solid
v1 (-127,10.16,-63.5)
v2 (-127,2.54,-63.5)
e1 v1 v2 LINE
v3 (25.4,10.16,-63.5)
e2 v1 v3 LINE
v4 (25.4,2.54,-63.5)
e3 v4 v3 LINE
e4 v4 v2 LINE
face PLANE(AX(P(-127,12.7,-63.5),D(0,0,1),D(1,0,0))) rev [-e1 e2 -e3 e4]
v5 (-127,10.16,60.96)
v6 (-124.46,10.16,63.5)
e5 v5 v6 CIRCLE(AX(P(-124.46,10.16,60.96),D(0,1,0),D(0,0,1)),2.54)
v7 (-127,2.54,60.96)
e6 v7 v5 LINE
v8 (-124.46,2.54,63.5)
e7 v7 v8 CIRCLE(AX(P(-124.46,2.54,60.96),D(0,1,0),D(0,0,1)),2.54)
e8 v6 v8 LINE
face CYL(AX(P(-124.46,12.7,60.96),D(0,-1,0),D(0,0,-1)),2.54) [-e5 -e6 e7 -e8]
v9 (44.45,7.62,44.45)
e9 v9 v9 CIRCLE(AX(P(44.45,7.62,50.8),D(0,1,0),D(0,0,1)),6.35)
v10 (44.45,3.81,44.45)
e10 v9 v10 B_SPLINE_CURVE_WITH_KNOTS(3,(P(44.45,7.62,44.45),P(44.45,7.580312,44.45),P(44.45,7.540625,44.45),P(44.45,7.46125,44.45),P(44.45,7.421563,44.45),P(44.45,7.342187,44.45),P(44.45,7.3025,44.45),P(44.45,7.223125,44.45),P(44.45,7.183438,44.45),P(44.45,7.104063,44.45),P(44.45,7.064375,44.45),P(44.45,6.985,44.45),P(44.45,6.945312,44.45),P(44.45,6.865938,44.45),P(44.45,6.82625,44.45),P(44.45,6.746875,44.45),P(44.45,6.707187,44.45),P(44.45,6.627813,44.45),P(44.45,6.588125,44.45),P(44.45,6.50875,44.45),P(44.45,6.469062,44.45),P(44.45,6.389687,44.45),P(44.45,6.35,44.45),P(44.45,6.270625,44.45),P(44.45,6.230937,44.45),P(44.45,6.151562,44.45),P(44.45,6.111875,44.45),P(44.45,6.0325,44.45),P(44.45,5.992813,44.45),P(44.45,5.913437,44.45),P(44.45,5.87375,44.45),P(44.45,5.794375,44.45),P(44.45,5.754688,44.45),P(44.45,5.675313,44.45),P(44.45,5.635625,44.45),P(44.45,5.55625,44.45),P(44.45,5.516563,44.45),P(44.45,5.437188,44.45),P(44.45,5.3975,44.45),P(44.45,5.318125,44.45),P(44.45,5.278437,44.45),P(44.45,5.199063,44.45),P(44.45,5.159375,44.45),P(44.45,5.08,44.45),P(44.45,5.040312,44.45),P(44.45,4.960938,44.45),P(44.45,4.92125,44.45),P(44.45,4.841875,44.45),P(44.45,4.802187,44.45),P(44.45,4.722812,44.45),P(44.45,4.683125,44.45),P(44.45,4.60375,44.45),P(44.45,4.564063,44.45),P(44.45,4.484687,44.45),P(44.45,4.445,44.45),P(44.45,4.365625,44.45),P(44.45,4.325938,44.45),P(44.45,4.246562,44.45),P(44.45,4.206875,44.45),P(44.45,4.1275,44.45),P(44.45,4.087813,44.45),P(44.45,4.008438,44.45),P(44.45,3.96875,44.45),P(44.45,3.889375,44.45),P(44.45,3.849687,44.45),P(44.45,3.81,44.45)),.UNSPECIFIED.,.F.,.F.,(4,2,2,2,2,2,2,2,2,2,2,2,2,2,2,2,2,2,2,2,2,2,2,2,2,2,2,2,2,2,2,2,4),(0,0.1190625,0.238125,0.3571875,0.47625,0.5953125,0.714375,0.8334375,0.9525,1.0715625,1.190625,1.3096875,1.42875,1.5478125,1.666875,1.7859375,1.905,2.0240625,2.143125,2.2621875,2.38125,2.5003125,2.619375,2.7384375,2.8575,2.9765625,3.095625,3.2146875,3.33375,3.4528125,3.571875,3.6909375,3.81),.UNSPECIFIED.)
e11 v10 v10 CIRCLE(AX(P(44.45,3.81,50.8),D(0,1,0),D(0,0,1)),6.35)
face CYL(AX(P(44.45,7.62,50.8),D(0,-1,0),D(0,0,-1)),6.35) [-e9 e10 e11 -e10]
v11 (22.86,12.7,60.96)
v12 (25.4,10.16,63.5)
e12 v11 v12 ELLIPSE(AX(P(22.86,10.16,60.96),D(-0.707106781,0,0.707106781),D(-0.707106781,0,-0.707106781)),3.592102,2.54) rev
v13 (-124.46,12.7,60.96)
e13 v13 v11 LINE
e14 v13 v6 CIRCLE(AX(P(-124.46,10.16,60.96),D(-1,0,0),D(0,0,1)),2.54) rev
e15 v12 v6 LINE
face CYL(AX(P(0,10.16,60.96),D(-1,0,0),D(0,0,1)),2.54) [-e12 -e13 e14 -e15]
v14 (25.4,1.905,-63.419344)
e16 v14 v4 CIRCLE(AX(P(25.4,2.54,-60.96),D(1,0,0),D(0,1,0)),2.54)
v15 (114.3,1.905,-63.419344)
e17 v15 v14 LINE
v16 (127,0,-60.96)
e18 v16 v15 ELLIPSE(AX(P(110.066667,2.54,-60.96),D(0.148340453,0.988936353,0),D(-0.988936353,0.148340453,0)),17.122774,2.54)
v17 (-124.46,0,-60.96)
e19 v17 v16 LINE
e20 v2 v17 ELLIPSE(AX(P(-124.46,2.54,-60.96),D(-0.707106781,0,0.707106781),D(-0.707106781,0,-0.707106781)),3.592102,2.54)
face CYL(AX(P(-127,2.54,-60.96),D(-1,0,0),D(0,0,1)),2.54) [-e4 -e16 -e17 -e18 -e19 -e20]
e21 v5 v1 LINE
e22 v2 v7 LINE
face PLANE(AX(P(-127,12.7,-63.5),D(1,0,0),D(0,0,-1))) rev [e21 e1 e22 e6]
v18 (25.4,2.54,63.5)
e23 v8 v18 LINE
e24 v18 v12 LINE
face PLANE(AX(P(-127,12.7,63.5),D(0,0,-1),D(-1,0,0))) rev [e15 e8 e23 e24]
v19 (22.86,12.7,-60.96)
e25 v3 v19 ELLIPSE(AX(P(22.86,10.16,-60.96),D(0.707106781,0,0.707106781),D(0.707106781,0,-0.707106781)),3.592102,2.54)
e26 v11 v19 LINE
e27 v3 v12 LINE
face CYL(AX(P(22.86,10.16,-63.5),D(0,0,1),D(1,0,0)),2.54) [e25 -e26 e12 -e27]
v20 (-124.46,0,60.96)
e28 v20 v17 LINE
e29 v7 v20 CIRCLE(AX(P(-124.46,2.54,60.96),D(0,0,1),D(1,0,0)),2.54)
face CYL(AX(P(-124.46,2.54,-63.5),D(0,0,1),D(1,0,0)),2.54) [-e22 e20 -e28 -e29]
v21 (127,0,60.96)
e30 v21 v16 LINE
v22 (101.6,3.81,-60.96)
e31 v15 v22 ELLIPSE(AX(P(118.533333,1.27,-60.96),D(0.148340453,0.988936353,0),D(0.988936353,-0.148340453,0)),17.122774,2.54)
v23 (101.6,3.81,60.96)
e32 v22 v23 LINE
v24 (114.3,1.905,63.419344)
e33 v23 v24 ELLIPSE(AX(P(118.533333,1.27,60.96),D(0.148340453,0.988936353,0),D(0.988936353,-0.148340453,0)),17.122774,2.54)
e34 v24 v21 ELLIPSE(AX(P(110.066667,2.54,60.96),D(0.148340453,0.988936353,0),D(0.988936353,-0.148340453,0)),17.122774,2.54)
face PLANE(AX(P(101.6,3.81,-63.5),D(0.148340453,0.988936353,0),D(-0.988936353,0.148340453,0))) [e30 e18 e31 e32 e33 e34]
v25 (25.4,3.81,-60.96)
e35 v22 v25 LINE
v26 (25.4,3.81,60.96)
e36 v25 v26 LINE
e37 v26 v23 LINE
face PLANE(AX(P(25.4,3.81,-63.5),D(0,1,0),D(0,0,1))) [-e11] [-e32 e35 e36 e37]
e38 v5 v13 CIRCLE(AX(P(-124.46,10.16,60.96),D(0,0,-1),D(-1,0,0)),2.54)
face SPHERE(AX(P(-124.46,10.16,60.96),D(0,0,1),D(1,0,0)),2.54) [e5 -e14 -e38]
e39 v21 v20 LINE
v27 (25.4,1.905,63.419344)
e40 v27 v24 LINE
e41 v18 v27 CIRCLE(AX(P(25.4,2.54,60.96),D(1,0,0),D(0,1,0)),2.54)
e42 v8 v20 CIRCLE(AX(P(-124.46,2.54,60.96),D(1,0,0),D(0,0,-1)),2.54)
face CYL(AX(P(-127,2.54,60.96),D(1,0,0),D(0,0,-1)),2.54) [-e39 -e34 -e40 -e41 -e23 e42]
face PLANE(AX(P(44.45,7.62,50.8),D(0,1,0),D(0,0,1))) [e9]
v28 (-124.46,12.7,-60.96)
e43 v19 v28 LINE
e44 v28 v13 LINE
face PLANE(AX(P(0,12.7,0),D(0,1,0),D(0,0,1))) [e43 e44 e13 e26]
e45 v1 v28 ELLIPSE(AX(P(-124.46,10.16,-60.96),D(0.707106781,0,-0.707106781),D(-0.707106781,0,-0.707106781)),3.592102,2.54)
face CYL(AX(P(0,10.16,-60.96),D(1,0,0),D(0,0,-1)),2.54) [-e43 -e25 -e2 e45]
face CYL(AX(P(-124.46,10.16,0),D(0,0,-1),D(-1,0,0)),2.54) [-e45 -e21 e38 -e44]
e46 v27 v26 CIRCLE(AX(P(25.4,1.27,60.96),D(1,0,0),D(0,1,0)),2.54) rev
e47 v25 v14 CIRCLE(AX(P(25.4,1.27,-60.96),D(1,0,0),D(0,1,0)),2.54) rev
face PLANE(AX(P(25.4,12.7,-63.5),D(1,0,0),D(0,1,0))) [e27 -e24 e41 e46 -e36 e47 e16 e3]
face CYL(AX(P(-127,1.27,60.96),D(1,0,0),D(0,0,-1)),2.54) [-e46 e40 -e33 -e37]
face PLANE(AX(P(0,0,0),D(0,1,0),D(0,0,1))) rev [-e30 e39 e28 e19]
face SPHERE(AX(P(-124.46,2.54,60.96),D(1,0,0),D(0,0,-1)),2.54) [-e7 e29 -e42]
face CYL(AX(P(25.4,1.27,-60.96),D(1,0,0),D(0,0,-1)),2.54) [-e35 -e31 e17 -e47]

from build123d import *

# Parameters (mm, degrees)
SKETCH1_W           = 254
SKETCH1_H           = 127
BOSS_EXTRUDE1_DEPTH = 12.7
SKETCH2_OUTSIDE_W   = 312.852
SKETCH2_OUTSIDE_H   = 71.552
CUT_EXTRUDE2_DEPTH  = 181.05357536
FILLET1_R           = 2.54
FILLET4_R           = 2.54
FILLET5_R           = 2.54
SKETCH3_R           = 6.35
BOSS_EXTRUDE2_DEPTH = 3.81


with BuildPart() as part:
    # Sketch1 → Boss-Extrude1 (new body)
    with BuildSketch(Plane(origin=(0, 0, 0), x_dir=(1, 0, 0), z_dir=(0, 1, 0))):
        Rectangle(SKETCH1_W, SKETCH1_H)
    extrude(amount=BOSS_EXTRUDE1_DEPTH)

    # Sketch2 outside → Cut-Extrude2 (cut, through all)
    with BuildSketch(Plane.XY.offset(63.5)):
        with Locations((0, 6.35)):
            Rectangle(SKETCH2_OUTSIDE_W, SKETCH2_OUTSIDE_H)
        Polygon((25.4, 12.7), (25.4, 3.81), (101.6, 3.81), (127, 0), (-127, 0), (-127, 12.7), align=None, mode=Mode.SUBTRACT)
    extrude(amount=-CUT_EXTRUDE2_DEPTH, mode=Mode.SUBTRACT)

    # Fillet1
    fillet1_edges = [part.edges().sort_by_distance(p)[0] for p in [
        (-127, 12.7, 0),
        (-50.8, 12.7, -63.5),
        (-50.8, 12.7, 63.5),
        (25.4, 12.7, 0),
    ]]
    fillet(fillet1_edges, radius=FILLET1_R)

    # Fillet4
    fillet4_edges = [part.edges().sort_by_distance(p)[0] for p in [
        (63.5, 3.81, -63.5),
    ]]
    fillet(fillet4_edges, radius=FILLET4_R)
    fillet4_2_edges = [part.edges().sort_by_distance(p)[0] for p in [
        (63.5, 3.81, 63.5),
    ]]
    fillet(fillet4_2_edges, radius=FILLET4_R)
    fillet4_3_edges = [part.edges().sort_by_distance(p)[0] for p in [
        (0, 0, 63.5),
    ]]
    fillet(fillet4_3_edges, radius=FILLET4_R)

    # Fillet5
    # the kernel refuses this fillet: 2.54 mm, written as the material it takes off along each edge
    with BuildSketch(Plane(origin=(-124.46, 10.16, 60.96), x_dir=(-1, 0, 0), z_dir=(0, 0, 1))) as fillet5_piece_1_section:
        Polygon((0, 0), (FILLET5_R, 0), (FILLET5_R, -FILLET5_R), (0, -FILLET5_R), align=None)
    fillet5_piece_1 = extrude(amount=FILLET5_R, mode=Mode.PRIVATE)
    fillet5_piece_1 = fillet5_piece_1 - Plane(origin=(-124.46, 10.16, 60.96), x_dir=(0.7071067811865475, -0.7071067811865475, 0), z_dir=(0, 0, 1)) * Sphere(FILLET5_R, mode=Mode.PRIVATE)
    add(fillet5_piece_1, mode=Mode.SUBTRACT)
    with BuildSketch(Plane(origin=(-127, 2.54, 63.5), x_dir=(1, 0, 0), z_dir=(0, 1, 0))) as fillet5_piece_2:
        with BuildLine():
            CenterArc((FILLET5_R, FILLET5_R), FILLET5_R, 180, 90)
            Line((0, FILLET5_R), (0, 0))
            Line((0, 0), (FILLET5_R, 0))
        make_face()
    extrude(amount=7.62, mode=Mode.SUBTRACT)
    with BuildSketch(Plane(origin=(-127, 2.54, 60.96), x_dir=(0, -1, 0), z_dir=(0, 0, -1))) as fillet5_piece_3:
        with BuildLine():
            CenterArc((2.54 - FILLET5_R, -FILLET5_R), FILLET5_R, 0, 90)
            Line((2.54 - FILLET5_R, 0), (2.54, 0))
            Line((2.54, 0), (2.54, -FILLET5_R))
        make_face()
    revolve(axis=Axis((-127, 2.54, 60.96), (-1, 0, 0)), revolution_arc=90, mode=Mode.SUBTRACT)
    with BuildSketch(Plane(origin=(-127, 0, 60.96), x_dir=(1, 0, 0), z_dir=(0, 0, -1))) as fillet5_piece_4:
        with BuildLine():
            CenterArc((FILLET5_R, -FILLET5_R), FILLET5_R, 90, 90)
            Line((0, -FILLET5_R), (0, 0))
            Line((0, 0), (FILLET5_R, 0))
        make_face()
    extrude(amount=130.81, mode=Mode.SUBTRACT)
    with BuildSketch(Plane(origin=(-133.35, 0, -63.5), x_dir=(0, 1, 0), z_dir=(1, 0, 0))) as fillet5_piece_5:
        with BuildLine():
            CenterArc((FILLET5_R, FILLET5_R), FILLET5_R, 180, 90)
            Line((0, FILLET5_R), (0, 0))
            Line((0, 0), (FILLET5_R, 0))
        make_face()
    extrude(amount=266.7, mode=Mode.SUBTRACT)

    # Sketch3 → Boss-Extrude2 (add)
    with BuildSketch(Plane(origin=(0, 3.81, 0), x_dir=(1, 0, 0), z_dir=(0, 1, 0))):
        with Locations(Location((44.45, -50.8, 0), (0, 0, 90))):
            Circle(SKETCH3_R)
    extrude(amount=BOSS_EXTRUDE2_DEPTH)


solid = part.part
